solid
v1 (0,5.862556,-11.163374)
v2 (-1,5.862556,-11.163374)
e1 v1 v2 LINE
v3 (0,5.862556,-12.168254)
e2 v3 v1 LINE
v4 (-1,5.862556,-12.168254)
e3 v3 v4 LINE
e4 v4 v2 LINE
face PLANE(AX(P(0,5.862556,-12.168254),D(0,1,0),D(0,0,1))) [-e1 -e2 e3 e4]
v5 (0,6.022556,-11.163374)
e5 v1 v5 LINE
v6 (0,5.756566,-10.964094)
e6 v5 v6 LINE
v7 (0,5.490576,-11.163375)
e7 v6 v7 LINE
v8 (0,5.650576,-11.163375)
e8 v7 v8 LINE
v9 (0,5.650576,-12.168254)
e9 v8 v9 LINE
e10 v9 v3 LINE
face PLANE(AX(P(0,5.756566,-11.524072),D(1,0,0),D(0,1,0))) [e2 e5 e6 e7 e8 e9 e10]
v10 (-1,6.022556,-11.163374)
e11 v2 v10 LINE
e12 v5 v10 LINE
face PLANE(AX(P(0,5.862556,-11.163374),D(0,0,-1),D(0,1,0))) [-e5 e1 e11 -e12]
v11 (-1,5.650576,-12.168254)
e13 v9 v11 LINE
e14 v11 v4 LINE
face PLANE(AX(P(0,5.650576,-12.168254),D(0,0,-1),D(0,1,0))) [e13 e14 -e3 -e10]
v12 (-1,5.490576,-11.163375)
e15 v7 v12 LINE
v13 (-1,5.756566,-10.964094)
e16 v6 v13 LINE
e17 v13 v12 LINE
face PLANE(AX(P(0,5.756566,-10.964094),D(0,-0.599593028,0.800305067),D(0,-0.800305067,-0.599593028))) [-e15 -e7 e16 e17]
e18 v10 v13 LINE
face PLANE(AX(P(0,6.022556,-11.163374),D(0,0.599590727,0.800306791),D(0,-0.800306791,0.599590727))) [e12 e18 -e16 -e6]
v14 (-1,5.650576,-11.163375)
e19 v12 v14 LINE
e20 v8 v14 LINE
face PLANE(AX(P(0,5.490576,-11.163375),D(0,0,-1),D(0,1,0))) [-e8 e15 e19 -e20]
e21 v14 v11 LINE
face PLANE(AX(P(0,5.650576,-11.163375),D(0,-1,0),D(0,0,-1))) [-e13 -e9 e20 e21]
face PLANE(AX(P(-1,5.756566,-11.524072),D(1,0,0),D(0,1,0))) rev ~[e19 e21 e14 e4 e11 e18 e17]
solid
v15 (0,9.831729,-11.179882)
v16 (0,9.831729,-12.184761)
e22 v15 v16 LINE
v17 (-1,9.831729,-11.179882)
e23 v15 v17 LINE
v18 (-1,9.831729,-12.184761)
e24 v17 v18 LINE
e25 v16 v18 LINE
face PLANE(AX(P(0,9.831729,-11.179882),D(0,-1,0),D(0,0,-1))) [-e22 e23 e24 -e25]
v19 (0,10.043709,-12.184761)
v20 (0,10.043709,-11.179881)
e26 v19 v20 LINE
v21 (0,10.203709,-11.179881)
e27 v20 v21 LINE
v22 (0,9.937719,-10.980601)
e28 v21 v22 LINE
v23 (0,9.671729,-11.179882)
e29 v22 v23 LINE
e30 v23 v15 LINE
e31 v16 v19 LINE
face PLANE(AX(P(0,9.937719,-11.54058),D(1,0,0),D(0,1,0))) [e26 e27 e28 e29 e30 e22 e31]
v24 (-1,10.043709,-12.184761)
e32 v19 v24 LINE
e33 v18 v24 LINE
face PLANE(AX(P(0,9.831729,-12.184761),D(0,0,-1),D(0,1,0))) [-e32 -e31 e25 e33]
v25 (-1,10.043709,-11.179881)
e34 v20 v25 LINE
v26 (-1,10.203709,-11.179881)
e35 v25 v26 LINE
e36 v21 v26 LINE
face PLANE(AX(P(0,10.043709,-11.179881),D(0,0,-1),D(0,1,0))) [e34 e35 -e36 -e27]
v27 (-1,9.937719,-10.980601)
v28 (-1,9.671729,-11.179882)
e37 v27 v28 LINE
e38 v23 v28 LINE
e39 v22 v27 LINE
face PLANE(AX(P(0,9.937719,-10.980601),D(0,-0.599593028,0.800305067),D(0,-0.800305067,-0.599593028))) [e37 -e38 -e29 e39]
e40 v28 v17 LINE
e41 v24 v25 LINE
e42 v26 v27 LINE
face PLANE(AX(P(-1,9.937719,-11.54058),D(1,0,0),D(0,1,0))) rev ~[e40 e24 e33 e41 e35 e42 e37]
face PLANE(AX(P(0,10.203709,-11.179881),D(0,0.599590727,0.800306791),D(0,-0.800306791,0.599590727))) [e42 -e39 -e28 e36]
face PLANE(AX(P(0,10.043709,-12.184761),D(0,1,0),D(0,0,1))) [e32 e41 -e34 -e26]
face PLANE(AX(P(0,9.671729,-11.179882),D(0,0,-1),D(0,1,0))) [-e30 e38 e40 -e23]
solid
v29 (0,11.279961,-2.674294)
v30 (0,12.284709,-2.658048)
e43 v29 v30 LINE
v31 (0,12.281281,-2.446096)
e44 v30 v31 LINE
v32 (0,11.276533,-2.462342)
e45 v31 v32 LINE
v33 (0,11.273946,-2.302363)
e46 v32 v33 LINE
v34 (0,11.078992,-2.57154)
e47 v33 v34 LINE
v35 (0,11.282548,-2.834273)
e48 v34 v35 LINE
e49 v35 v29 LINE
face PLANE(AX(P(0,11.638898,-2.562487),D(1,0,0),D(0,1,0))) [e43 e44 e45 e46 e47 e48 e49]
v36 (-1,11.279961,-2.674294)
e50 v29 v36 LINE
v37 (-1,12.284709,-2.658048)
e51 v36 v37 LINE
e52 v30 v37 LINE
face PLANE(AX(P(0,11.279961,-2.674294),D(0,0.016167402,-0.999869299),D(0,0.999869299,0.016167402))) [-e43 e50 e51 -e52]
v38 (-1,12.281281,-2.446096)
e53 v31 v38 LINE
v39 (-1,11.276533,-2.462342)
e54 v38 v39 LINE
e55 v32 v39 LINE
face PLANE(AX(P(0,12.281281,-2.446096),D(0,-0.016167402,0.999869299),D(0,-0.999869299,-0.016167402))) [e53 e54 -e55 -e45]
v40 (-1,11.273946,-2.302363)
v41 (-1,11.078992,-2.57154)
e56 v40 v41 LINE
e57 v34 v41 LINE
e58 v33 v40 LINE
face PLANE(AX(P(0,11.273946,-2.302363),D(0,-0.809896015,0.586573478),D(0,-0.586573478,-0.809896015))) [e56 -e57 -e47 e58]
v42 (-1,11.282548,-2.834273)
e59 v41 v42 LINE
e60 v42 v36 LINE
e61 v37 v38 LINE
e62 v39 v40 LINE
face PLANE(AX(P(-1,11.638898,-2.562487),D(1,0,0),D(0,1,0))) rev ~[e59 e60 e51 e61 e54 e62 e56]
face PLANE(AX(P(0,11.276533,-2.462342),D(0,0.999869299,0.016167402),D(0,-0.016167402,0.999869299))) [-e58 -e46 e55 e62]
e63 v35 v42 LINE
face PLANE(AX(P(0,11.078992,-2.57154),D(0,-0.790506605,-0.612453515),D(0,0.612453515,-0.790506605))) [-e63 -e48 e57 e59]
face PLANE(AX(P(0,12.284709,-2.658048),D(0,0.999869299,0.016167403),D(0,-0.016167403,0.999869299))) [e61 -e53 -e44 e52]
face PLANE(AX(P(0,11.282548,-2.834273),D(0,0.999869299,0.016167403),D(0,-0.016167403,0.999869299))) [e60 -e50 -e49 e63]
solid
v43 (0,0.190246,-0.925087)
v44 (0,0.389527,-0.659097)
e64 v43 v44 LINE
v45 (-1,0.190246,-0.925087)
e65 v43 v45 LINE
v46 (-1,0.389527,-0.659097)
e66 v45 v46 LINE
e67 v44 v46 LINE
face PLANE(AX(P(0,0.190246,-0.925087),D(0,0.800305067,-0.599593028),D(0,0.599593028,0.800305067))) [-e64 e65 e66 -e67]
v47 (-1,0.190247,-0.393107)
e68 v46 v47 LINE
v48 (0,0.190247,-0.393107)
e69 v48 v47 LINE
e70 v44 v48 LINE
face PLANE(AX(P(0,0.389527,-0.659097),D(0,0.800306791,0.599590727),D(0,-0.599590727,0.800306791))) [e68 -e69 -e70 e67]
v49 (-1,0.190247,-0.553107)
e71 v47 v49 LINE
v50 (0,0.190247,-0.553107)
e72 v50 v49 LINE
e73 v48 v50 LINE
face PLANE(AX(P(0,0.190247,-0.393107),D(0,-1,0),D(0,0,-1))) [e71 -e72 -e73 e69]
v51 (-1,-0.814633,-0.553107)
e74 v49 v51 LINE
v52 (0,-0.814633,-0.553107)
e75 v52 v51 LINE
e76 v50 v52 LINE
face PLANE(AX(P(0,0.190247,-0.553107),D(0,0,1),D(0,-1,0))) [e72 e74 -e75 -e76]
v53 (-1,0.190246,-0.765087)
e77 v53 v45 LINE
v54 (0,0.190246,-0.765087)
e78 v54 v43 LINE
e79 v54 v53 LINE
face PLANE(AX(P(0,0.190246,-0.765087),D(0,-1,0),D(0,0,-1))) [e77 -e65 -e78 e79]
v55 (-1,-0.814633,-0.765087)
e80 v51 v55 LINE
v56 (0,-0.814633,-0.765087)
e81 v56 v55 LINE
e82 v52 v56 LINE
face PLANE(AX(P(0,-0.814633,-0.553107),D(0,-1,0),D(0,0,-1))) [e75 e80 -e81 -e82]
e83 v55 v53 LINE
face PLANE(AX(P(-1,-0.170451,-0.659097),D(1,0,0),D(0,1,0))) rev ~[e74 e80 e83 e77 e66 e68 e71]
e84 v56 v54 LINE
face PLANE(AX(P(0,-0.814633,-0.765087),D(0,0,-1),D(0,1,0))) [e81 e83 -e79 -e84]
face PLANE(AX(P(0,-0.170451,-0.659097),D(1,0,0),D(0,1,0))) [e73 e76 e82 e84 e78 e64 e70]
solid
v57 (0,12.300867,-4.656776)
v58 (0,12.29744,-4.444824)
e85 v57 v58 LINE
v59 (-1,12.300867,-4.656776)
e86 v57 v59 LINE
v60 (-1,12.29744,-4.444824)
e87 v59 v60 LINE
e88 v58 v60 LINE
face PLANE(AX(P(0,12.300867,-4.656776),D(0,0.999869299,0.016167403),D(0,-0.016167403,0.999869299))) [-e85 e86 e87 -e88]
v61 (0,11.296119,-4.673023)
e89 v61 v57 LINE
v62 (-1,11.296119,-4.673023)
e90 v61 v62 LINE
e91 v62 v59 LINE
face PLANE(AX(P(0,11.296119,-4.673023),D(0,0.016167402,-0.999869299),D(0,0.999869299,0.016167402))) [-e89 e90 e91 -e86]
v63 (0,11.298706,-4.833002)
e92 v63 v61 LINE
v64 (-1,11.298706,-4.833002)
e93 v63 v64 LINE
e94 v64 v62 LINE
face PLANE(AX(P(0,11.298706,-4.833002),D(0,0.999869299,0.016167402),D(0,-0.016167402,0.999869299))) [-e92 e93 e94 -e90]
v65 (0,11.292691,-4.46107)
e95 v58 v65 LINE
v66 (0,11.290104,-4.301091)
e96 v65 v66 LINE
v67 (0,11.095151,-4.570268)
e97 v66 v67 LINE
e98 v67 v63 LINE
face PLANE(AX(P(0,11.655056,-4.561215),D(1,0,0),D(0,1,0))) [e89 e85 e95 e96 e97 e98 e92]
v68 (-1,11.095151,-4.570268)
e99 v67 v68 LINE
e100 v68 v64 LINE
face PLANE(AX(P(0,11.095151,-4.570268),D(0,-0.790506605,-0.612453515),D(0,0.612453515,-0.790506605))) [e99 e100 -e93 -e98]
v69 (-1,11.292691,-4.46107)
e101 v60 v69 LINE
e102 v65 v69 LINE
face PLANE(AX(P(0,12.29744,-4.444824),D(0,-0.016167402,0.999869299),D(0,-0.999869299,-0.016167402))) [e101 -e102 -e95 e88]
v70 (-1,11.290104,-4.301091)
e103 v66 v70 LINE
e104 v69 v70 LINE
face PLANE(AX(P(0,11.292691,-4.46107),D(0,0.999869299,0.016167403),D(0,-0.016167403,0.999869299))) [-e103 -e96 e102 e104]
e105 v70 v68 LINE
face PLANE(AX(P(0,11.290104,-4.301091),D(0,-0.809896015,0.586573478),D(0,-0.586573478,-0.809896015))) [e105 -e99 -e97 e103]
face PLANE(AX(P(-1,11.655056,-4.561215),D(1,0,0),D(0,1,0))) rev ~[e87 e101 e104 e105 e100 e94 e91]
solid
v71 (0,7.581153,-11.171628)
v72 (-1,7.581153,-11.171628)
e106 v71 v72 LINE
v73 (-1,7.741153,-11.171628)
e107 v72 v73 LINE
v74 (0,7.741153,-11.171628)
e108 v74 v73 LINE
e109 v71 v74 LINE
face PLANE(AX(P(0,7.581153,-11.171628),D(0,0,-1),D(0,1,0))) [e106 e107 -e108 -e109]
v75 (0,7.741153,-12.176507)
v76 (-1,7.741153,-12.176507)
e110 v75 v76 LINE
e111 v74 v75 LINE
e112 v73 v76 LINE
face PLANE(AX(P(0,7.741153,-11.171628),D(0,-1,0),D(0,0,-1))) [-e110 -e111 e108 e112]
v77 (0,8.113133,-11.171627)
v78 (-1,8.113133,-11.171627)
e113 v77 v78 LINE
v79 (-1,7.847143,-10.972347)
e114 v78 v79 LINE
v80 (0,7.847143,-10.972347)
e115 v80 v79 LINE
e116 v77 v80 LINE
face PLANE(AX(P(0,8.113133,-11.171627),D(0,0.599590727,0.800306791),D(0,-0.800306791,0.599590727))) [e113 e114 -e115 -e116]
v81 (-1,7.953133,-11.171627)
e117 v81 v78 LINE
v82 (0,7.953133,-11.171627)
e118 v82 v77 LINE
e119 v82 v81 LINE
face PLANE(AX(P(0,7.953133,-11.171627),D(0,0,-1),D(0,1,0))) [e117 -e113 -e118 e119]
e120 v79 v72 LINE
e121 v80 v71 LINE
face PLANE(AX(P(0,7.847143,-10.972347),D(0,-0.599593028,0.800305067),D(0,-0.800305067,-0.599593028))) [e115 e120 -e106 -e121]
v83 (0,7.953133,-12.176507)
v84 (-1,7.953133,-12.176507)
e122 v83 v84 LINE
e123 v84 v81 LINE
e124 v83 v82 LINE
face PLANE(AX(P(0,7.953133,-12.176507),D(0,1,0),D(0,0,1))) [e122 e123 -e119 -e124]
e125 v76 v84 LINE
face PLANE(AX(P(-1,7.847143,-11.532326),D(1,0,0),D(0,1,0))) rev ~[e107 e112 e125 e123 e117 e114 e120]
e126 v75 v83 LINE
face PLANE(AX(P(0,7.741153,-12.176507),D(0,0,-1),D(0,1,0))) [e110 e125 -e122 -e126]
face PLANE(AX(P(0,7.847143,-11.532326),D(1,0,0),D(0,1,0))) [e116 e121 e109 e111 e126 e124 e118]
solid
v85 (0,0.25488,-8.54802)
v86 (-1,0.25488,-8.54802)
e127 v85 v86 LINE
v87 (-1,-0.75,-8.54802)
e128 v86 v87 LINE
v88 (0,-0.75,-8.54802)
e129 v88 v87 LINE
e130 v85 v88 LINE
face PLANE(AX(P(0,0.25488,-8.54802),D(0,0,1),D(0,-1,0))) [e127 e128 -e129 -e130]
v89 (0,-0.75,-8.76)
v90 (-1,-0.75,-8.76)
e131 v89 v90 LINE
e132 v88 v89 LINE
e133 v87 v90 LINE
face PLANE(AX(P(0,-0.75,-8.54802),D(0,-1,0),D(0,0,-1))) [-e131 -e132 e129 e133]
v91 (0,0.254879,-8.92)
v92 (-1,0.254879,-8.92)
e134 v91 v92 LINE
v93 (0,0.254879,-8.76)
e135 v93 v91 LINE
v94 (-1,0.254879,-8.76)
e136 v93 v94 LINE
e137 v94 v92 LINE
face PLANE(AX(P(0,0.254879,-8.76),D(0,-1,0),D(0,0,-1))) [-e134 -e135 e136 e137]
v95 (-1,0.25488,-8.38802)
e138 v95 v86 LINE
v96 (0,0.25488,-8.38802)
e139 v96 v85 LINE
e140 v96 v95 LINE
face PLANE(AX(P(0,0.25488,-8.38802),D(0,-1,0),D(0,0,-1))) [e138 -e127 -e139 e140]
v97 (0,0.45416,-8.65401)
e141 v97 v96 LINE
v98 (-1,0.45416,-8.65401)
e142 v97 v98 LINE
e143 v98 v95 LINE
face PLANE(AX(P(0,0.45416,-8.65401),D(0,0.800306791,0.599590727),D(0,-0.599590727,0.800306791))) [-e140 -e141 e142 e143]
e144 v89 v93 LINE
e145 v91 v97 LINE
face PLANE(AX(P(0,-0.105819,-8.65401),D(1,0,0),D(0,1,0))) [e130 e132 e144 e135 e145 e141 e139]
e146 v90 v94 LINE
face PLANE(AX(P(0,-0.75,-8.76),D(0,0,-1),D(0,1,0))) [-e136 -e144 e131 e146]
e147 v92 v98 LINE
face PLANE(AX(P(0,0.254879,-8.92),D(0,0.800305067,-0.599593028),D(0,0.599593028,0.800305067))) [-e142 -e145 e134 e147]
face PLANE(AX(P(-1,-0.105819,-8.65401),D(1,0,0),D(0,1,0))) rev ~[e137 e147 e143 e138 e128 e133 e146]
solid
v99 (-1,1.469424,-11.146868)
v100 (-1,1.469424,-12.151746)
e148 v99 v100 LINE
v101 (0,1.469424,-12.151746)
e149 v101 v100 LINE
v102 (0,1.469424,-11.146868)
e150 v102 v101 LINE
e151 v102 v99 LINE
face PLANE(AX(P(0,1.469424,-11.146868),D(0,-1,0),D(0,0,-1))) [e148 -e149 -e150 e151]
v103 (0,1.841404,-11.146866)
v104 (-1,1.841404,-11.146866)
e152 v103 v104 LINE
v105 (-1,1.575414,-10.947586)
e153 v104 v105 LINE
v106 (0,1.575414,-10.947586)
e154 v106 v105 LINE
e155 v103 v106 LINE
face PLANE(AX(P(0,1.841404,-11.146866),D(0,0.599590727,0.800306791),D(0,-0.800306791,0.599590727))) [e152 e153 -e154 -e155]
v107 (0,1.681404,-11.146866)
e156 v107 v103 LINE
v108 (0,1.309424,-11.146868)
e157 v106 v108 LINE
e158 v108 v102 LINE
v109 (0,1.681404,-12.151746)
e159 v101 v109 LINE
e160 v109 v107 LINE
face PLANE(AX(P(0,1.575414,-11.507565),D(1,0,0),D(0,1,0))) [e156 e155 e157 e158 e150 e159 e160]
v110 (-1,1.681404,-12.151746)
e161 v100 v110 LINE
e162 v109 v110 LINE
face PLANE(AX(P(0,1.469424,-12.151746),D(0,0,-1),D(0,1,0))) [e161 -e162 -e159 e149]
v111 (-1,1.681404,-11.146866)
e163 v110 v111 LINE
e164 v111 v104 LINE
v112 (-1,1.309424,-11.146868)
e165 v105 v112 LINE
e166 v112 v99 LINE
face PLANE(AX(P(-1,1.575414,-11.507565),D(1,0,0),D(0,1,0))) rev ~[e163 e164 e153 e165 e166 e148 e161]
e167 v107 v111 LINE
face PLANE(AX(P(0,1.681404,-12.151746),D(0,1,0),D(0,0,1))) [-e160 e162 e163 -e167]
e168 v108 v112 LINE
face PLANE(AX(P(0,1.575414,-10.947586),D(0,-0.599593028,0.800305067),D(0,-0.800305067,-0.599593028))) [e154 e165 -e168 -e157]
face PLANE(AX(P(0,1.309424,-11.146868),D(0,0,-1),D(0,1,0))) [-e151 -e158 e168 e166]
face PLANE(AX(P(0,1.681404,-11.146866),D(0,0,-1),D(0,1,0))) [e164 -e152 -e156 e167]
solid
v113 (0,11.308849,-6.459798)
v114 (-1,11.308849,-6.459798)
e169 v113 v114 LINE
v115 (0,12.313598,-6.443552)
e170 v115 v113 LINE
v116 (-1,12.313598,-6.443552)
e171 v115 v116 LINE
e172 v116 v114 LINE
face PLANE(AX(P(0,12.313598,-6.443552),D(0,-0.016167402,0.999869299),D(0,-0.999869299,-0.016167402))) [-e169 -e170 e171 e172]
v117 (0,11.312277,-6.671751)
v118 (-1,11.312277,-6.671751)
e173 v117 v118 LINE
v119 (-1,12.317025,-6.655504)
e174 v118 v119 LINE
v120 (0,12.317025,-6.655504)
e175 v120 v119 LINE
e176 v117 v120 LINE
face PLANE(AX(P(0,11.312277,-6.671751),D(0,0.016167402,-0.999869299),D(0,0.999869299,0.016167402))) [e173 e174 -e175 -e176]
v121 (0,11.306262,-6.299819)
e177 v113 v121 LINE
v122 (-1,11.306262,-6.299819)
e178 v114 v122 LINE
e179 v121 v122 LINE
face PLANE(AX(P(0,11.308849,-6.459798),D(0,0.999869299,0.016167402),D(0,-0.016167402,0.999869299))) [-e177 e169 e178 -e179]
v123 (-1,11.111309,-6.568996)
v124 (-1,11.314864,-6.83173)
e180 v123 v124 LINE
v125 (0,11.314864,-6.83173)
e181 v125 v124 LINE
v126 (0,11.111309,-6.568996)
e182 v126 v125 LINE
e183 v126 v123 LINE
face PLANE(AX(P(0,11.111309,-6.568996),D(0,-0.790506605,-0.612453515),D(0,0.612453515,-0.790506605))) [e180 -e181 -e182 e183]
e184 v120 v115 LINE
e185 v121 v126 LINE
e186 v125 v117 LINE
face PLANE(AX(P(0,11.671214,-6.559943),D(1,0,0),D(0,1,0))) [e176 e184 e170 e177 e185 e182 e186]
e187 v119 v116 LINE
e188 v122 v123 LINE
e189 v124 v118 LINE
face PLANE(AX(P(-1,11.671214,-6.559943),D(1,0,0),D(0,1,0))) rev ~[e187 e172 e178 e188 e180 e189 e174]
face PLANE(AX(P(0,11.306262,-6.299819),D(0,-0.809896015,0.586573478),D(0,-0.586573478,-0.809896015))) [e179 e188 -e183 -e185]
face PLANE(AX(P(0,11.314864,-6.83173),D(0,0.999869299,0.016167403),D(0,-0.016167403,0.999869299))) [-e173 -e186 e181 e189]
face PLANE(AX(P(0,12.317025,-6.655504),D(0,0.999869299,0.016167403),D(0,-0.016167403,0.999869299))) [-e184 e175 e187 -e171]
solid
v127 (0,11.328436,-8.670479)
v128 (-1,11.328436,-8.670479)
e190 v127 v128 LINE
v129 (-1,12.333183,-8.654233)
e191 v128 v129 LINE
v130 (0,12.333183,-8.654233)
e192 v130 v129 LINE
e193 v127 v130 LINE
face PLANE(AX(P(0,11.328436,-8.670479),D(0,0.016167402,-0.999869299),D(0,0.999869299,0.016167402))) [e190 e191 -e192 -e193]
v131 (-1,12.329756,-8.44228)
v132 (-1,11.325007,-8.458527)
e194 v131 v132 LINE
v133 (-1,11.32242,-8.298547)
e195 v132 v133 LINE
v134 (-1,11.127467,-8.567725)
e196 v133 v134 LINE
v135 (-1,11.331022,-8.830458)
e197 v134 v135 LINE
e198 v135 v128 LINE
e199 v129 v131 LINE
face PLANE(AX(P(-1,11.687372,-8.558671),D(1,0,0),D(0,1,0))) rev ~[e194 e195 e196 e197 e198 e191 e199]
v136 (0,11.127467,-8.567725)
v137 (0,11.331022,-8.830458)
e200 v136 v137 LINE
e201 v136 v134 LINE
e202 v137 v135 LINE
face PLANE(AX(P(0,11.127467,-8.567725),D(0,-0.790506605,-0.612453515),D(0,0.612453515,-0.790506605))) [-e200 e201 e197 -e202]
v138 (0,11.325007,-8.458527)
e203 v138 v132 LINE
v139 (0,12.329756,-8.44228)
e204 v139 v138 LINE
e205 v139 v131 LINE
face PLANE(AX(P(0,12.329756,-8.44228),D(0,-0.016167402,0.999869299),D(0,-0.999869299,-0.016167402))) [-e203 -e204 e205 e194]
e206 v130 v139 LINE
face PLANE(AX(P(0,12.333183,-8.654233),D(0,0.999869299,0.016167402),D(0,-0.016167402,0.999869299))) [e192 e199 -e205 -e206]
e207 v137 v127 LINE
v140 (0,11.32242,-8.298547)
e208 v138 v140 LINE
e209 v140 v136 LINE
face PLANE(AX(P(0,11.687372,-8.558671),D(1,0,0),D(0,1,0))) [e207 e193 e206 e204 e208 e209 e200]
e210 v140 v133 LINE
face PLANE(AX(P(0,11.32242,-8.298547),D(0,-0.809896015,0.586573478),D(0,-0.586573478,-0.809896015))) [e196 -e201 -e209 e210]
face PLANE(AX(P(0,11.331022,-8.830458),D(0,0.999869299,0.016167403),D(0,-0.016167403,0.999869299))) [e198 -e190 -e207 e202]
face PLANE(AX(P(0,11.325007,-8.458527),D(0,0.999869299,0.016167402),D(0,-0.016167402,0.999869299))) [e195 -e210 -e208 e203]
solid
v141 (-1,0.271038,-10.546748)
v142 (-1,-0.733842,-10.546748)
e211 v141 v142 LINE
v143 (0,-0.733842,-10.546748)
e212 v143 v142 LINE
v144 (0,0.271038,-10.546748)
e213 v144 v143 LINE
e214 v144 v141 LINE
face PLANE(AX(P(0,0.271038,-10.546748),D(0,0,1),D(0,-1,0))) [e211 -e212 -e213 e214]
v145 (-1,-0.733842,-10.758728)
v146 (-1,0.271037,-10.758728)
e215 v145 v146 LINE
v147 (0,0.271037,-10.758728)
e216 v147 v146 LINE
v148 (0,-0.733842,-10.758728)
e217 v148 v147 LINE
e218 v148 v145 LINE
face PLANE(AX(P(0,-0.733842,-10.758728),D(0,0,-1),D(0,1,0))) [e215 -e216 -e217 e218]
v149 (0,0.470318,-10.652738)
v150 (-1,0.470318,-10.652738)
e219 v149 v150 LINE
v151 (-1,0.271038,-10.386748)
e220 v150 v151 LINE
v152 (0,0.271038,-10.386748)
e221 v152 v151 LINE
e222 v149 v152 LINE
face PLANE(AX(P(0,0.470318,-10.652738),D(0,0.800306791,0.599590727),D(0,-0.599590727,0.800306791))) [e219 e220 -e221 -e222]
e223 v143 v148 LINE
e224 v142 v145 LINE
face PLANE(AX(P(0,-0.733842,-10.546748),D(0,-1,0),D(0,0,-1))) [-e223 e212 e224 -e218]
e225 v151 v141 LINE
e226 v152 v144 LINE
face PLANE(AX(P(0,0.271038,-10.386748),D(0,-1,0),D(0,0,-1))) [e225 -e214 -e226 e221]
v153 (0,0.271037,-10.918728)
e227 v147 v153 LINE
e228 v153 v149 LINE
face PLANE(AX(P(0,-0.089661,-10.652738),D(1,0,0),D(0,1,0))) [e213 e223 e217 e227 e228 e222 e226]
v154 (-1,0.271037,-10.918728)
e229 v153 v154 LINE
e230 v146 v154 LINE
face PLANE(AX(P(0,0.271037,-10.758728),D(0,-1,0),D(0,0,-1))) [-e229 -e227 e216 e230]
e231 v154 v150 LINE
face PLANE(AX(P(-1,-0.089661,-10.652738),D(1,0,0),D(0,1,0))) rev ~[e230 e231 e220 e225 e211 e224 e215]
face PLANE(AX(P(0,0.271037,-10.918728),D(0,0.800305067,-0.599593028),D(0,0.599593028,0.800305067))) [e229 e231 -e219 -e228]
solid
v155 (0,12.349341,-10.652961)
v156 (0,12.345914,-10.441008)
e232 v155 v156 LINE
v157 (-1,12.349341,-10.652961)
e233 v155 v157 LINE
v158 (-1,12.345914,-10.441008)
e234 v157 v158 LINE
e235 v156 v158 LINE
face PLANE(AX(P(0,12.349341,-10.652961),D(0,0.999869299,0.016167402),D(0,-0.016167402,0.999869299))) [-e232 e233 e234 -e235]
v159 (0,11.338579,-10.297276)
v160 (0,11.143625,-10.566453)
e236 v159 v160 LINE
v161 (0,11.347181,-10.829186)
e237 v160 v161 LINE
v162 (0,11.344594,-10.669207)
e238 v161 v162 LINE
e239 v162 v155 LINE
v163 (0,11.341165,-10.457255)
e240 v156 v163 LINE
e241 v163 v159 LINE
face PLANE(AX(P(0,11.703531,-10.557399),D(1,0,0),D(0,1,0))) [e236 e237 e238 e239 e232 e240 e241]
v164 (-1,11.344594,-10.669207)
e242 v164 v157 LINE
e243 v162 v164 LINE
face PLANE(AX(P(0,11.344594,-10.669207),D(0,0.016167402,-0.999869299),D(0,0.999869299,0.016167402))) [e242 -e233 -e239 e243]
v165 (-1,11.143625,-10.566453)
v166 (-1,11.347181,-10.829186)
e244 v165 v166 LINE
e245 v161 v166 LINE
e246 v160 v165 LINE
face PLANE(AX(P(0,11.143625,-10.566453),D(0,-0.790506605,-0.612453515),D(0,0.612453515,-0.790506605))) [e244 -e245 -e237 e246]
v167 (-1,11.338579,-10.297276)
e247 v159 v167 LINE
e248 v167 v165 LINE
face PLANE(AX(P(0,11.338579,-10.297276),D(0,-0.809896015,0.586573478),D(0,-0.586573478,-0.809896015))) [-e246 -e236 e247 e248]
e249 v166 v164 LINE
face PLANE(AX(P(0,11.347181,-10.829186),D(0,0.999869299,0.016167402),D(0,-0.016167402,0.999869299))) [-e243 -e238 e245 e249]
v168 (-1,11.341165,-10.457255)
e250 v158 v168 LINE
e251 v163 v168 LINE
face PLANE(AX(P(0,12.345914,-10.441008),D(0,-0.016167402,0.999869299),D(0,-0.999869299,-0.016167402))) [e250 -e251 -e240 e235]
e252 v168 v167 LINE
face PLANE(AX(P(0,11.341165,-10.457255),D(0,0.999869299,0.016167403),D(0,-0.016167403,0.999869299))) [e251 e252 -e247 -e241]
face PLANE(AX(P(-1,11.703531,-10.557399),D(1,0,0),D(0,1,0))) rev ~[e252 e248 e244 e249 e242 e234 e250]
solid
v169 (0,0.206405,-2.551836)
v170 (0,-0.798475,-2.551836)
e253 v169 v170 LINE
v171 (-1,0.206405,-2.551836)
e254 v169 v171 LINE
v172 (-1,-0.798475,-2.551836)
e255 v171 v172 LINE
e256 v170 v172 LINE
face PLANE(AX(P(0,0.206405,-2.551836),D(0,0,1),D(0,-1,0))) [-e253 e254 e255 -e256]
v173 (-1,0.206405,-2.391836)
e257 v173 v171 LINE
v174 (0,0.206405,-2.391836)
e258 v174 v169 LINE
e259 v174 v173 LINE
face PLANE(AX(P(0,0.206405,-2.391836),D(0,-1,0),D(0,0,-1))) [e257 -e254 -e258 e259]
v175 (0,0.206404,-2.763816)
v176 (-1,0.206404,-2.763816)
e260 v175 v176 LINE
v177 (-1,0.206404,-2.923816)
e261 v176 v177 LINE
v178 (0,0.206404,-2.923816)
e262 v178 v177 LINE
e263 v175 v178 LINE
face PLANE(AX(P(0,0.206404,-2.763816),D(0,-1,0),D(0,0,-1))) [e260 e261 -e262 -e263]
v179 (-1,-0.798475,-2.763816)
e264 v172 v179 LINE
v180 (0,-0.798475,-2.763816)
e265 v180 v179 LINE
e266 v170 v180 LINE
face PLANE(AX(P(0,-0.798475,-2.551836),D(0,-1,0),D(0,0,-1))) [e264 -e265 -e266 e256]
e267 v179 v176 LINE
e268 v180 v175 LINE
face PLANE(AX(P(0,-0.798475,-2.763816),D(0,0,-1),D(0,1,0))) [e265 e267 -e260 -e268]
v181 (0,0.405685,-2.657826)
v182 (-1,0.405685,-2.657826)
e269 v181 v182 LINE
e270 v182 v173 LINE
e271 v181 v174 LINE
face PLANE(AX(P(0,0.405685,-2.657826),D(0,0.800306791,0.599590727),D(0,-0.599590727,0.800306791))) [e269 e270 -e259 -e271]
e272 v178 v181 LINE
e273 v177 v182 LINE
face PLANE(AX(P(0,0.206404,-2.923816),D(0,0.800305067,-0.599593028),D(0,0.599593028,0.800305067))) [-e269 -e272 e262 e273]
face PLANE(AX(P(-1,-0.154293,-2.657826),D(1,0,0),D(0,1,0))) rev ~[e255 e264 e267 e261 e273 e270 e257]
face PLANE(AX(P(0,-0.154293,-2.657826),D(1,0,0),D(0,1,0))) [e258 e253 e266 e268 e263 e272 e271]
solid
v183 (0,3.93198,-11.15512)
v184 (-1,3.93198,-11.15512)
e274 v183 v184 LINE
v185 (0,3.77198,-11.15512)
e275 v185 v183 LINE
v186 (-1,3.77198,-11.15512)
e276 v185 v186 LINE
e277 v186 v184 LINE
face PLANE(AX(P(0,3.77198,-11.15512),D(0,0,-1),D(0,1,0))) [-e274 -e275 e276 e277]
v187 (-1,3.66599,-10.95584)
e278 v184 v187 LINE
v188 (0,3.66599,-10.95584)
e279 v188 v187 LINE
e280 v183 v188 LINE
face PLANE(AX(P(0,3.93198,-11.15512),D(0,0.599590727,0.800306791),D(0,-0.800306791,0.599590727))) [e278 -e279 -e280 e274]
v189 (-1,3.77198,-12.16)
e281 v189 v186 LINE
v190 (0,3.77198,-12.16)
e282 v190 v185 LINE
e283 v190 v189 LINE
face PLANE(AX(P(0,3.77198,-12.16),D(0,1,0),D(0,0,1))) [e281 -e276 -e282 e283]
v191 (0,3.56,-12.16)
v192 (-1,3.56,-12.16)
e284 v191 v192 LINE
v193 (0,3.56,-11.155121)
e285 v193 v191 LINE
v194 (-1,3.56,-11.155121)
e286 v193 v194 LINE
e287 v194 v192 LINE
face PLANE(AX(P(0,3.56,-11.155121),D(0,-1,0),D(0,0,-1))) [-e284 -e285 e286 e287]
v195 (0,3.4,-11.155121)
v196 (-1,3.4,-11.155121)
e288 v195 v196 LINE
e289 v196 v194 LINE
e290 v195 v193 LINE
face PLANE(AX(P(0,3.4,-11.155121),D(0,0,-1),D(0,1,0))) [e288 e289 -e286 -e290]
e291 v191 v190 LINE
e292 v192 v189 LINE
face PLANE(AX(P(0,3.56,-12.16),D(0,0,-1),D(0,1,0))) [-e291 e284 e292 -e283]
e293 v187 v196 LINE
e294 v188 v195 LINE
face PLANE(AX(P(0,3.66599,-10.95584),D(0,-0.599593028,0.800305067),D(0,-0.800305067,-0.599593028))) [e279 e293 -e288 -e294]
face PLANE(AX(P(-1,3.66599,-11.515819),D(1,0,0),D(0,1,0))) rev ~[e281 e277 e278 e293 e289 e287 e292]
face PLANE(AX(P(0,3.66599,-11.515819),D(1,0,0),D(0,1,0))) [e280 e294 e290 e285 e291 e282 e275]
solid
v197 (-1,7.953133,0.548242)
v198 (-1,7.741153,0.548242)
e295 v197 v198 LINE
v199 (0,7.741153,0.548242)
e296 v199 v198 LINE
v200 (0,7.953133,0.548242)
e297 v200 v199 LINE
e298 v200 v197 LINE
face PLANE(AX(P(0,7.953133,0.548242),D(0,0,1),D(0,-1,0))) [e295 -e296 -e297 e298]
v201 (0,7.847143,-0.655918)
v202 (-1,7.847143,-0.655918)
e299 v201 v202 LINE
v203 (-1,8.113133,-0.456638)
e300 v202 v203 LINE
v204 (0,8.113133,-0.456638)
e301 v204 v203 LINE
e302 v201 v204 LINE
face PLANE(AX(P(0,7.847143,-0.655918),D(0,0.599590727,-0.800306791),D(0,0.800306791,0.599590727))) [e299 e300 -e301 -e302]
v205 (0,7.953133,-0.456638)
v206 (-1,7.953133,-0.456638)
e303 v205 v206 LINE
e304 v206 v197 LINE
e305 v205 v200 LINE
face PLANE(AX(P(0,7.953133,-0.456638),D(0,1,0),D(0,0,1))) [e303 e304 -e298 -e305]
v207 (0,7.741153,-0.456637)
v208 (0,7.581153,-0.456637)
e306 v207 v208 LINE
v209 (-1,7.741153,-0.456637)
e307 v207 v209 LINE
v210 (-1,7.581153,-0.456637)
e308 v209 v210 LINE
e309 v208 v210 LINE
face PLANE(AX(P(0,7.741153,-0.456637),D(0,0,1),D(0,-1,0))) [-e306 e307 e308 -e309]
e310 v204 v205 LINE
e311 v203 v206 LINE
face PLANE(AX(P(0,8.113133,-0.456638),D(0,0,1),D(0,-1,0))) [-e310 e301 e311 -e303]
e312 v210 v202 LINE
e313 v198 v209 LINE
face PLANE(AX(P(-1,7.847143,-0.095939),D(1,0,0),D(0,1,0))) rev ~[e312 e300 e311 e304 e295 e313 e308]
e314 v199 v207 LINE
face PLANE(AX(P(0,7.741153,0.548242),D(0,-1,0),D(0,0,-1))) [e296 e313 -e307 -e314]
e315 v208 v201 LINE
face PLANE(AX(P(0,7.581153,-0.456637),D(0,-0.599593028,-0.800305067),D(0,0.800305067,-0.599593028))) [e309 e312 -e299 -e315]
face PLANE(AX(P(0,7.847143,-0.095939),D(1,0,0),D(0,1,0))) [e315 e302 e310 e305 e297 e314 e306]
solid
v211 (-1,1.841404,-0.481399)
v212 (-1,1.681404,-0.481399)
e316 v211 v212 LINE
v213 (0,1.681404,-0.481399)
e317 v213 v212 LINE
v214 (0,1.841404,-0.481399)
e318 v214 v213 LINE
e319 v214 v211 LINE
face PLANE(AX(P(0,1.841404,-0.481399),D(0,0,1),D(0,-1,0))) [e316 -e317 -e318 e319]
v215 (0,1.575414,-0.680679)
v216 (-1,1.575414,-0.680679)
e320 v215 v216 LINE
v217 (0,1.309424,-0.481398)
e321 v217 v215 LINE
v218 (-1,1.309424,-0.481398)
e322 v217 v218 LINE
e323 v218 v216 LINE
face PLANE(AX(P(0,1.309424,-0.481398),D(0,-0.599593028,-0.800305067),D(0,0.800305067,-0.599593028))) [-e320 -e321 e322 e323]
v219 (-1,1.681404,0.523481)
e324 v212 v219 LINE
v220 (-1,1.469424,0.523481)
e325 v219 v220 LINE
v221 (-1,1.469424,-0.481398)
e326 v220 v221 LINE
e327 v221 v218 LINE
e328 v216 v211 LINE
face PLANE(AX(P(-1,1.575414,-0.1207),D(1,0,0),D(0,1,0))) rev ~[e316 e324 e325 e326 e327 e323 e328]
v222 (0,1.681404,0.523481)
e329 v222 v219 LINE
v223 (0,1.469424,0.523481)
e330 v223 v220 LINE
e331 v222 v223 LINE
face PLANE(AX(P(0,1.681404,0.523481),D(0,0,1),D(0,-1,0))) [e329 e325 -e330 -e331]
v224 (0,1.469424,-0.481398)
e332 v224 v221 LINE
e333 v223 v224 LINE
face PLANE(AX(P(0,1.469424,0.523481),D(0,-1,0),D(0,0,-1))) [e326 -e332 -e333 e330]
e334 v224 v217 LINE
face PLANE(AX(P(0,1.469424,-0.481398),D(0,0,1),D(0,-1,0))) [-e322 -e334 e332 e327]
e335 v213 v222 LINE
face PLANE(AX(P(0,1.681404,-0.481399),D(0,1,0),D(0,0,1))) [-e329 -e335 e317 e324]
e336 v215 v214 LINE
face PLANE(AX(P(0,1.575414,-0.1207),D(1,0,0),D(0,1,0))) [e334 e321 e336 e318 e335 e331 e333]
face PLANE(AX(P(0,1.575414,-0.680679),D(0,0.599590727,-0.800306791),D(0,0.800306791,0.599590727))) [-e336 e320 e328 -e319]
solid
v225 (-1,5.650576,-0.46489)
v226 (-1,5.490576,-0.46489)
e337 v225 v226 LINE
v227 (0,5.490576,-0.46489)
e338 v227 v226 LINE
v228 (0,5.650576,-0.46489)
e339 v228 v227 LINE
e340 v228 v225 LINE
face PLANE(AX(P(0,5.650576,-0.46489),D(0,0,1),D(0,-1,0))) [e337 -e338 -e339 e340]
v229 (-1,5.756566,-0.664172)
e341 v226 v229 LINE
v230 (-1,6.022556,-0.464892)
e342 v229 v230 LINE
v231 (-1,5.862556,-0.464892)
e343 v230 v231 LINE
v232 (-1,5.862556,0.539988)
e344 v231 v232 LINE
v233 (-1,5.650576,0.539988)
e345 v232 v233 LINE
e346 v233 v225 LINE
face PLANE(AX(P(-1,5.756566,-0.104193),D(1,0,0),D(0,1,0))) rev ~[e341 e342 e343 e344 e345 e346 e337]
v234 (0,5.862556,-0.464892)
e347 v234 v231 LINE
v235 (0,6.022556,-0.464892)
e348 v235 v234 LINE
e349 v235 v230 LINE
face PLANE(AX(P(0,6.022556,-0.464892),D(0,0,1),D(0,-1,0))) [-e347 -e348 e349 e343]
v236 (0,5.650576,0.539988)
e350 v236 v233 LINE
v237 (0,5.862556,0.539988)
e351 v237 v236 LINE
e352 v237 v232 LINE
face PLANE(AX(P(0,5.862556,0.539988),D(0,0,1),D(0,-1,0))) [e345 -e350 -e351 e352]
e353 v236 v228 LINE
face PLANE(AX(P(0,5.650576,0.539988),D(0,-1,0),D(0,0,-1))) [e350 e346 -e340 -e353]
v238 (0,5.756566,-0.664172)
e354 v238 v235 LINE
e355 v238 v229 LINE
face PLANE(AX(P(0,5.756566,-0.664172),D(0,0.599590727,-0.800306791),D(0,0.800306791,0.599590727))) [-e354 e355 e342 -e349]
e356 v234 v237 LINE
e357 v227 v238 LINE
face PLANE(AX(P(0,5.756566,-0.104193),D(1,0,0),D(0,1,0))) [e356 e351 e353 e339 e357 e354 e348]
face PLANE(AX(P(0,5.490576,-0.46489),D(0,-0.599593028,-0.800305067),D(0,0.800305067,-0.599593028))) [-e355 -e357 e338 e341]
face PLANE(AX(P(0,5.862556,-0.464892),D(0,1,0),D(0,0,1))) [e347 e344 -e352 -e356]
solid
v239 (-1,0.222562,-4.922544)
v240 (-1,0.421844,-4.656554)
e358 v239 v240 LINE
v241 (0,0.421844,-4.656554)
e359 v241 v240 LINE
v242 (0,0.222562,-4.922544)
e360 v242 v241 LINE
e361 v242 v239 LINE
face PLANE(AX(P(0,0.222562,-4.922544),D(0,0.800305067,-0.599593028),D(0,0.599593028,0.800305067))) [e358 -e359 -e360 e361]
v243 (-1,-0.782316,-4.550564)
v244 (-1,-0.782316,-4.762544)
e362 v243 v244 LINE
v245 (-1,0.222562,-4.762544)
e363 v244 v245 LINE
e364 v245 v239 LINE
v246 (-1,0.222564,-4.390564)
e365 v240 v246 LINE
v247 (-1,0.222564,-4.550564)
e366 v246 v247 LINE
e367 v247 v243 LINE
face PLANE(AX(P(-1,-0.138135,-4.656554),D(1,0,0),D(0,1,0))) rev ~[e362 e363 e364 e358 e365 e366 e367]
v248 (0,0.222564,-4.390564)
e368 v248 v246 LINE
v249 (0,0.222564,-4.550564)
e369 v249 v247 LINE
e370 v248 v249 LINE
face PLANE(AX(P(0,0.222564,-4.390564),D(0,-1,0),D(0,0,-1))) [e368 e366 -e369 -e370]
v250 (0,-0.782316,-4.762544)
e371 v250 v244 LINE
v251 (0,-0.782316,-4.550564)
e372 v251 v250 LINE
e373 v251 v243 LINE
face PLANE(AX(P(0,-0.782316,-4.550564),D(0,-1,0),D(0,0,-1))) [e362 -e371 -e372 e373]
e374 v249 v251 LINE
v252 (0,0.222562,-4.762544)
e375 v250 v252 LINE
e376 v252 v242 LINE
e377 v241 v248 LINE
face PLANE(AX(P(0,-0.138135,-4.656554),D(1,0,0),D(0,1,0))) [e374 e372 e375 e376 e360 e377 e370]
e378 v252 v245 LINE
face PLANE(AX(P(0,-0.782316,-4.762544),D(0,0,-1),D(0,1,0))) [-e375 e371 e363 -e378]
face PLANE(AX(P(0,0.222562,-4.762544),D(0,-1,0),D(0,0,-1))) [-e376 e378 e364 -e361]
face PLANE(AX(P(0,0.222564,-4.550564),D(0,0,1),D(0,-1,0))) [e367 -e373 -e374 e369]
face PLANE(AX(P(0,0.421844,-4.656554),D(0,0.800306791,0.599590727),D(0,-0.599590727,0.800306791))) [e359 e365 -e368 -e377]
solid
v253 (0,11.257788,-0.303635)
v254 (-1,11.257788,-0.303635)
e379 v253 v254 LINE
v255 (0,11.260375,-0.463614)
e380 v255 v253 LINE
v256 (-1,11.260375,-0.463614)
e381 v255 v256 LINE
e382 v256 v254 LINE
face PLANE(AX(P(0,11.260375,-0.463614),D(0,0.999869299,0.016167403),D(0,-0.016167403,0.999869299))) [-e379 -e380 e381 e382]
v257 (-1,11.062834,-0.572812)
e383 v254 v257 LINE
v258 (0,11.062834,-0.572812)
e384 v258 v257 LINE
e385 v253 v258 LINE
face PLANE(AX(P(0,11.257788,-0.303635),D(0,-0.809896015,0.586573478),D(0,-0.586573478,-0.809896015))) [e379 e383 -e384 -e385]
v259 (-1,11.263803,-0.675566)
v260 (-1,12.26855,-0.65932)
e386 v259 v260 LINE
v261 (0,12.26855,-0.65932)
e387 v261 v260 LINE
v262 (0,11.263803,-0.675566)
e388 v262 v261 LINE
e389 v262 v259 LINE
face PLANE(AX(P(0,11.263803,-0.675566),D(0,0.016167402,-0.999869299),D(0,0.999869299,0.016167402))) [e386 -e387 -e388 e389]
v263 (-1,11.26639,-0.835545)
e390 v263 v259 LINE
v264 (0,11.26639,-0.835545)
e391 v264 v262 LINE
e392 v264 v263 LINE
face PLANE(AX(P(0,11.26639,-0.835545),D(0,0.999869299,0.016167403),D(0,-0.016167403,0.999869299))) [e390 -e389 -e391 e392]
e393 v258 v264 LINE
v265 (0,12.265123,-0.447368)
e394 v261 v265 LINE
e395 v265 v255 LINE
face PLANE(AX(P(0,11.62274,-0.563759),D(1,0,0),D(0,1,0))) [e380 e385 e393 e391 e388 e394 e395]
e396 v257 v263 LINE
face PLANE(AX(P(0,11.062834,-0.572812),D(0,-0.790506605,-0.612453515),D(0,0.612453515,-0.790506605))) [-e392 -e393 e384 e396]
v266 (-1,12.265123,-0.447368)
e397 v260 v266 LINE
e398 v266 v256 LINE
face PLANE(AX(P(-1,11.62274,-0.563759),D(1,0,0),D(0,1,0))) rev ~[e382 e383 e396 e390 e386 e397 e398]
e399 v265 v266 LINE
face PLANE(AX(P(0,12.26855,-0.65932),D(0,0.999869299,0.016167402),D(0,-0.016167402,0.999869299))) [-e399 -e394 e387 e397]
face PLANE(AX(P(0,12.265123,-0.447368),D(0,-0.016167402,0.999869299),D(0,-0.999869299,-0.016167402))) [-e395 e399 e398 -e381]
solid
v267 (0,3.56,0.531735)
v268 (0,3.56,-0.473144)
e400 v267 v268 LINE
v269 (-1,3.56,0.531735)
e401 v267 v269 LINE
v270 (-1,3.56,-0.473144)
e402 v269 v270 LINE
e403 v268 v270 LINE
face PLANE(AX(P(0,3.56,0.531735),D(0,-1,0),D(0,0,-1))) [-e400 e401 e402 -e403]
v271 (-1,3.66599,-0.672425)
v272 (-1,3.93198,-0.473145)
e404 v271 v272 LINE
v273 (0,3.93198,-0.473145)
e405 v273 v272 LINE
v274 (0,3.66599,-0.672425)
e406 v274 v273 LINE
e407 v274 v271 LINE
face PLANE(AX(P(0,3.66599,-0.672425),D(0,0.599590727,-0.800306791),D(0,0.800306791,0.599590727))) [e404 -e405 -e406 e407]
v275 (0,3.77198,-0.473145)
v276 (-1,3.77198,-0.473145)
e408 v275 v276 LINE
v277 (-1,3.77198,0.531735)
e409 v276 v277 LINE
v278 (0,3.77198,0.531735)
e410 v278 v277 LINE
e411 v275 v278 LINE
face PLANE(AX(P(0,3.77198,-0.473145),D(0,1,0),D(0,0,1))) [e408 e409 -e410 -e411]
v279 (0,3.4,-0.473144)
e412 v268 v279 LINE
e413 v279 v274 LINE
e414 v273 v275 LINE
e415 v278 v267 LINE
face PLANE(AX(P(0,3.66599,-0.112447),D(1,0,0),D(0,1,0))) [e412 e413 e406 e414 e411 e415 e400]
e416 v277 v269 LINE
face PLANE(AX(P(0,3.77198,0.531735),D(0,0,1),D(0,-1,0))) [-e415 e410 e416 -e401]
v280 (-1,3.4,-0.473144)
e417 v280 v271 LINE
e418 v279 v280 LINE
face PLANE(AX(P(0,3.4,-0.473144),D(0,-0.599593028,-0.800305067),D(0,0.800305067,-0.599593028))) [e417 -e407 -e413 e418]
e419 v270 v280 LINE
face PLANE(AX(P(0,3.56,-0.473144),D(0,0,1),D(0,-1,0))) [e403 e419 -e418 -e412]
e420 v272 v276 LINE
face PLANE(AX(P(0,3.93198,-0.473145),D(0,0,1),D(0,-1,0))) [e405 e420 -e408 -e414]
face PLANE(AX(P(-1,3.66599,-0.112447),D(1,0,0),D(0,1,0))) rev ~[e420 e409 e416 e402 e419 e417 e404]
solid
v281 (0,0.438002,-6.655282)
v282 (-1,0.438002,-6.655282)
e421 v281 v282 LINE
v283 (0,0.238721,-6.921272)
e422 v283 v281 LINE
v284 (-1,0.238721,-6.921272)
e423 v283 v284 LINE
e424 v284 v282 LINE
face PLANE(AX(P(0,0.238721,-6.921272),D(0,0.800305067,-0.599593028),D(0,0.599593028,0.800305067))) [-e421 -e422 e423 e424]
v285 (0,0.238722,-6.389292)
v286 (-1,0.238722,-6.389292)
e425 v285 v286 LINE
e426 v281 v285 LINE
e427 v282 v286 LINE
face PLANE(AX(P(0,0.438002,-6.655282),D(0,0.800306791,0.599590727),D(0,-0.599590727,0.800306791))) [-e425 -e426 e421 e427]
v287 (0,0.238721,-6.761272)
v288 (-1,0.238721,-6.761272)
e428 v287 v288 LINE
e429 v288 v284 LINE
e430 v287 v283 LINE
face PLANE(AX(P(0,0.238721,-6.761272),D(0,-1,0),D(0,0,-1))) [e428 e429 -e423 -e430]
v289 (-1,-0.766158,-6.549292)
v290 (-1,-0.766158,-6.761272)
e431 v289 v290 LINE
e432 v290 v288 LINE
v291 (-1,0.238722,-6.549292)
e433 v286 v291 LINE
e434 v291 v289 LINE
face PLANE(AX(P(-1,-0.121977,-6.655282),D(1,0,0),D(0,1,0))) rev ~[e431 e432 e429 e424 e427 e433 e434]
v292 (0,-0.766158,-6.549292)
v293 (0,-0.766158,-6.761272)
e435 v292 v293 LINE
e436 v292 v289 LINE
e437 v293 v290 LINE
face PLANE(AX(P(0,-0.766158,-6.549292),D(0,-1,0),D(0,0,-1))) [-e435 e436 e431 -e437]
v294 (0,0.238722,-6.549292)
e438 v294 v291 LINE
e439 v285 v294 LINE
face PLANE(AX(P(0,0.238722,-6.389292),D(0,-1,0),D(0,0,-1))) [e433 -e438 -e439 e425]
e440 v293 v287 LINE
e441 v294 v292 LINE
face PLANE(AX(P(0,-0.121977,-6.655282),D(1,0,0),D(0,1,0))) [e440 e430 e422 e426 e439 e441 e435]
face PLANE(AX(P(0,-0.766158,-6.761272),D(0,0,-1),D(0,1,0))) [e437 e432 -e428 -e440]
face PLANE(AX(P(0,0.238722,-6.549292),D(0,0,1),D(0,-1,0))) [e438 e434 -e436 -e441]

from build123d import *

# Parameters (mm, degrees)
F1_DEPTH = 1


# Not quite as in the source:
# - a feature names something its author has since deleted; it is built from what else it names


with BuildPart() as f1:
    # F0 (on Right) → F1 (new body)
    with BuildSketch(Plane.YZ):
        Polygon((-0.733841823, -10.7587281415), (0.2710369828, -10.7587281415), (0.2710369828, -10.9187281415), (0.470318177, -10.6527381415), (0.271038177, -10.3867481415), (0.271038177, -10.5467481415), (-0.733841823, -10.5467481415), align=None)
    extrude(amount=-F1_DEPTH)


with BuildPart() as f1b:
    # F0 (on Right) → F1, piece 2 (new body)
    with BuildSketch(Plane.YZ):
        Polygon((1.3094237074, -11.1468675475), (1.4694237074, -11.1468675475), (1.4694237074, -12.1517463532), (1.6814037074, -12.1517463532), (1.6814037074, -11.1468663532), (1.8414037074, -11.1468663532), (1.5754137074, -10.9475863532), align=None)
    extrude(amount=-F1_DEPTH)


with BuildPart() as f1c:
    # F0 (on Right) → F1, piece 3 (new body)
    with BuildSketch(Plane.YZ):
        Polygon((3.56, -11.1551211942), (3.56, -12.16), (3.77198, -12.16), (3.77198, -11.15512), (3.93198, -11.15512), (3.66599, -10.95584), (3.4, -11.1551211942), align=None)
    extrude(amount=-F1_DEPTH)


with BuildPart() as f1d:
    # F0 (on Right) → F1, piece 4 (new body)
    with BuildSketch(Plane.YZ):
        Polygon((5.6505762926, -11.163374841), (5.6505762926, -12.1682536468), (5.8625562926, -12.1682536468), (5.8625562926, -11.1633736468), (6.0225562926, -11.1633736468), (5.7565662926, -10.9640936468), (5.4905762926, -11.163374841), align=None)
    extrude(amount=-F1_DEPTH)


with BuildPart() as f1e:
    # F0 (on Right) → F1, piece 5 (new body)
    with BuildSketch(Plane.YZ):
        Polygon((7.7411525851, -11.1716284878), (7.7411525851, -12.1765072935), (7.9531325851, -12.1765072935), (7.9531325851, -11.1716272935), (8.1131325851, -11.1716272935), (7.8471425851, -10.9723472935), (7.5811525851, -11.1716284878), align=None)
    extrude(amount=-F1_DEPTH)


with BuildPart() as f1f:
    # F0 (on Right) → F1, piece 6 (new body)
    with BuildSketch(Plane.YZ):
        Polygon((9.8317288777, -11.1798821345), (9.8317288777, -12.1847609403), (10.0437088777, -12.1847609403), (10.0437088777, -11.1798809403), (10.2037088777, -11.1798809403), (9.9377188777, -10.9806009403), (9.6717288777, -11.1798821345), align=None)
    extrude(amount=-F1_DEPTH)


with BuildPart() as f1g:
    # F0 (on Right) → F1, piece 7 (new body)
    with BuildSketch(Plane.YZ):
        Polygon((11.3385786263, -10.2972756044), (11.1436250398, -10.5664526792), (11.3471805551, -10.8291860548), (11.3445937707, -10.6692069669), (12.3493412378, -10.6529606869), (12.3459140719, -10.4410083929), (11.3411654107, -10.4572546922), align=None)
    extrude(amount=-F1_DEPTH)


with BuildPart() as f1h:
    # F0 (on Right) → F1, piece 8 (new body)
    with BuildSketch(Plane.YZ):
        Polygon((11.3310223781, -8.8304579133), (11.3284355937, -8.6704788255), (12.3331830608, -8.6542325454), (12.3297558949, -8.4422802514), (11.3250072337, -8.4585265508), (11.3224204493, -8.2985474629), (11.1274668627, -8.5677245377), align=None)
    extrude(amount=-F1_DEPTH)


with BuildPart() as f1i:
    # F0 (on Right) → F1, piece 9 (new body)
    with BuildSketch(Plane.YZ):
        Polygon((11.3062622723, -6.2998193215), (11.1113086857, -6.5689963962), (11.3148642011, -6.8317297718), (11.3122774167, -6.671750684), (12.3170248838, -6.655504404), (12.3135977178, -6.44355211), (11.3088490566, -6.4597984093), align=None)
    extrude(amount=-F1_DEPTH)


with BuildPart() as f1j:
    # F0 (on Right) → F1, piece 10 (new body)
    with BuildSketch(Plane.YZ):
        Polygon((12.2974395408, -4.4448239685), (11.2926908796, -4.4610702678), (11.2901040952, -4.30109118), (11.0951505087, -4.5702682548), (11.298706024, -4.8330016304), (11.2961192397, -4.6730225425), (12.3008667068, -4.6567762625), align=None)
    extrude(amount=-F1_DEPTH)


with BuildPart() as f1k:
    # F0 (on Right) → F1, piece 11 (new body)
    with BuildSketch(Plane.YZ):
        Polygon((11.2739459182, -2.3023630385), (11.0789923317, -2.5715401133), (11.282547847, -2.8342734889), (11.2799610626, -2.6742944011), (12.2847085298, -2.658048121), (12.2812813638, -2.446095827), (11.2765327026, -2.4623421264), align=None)
    extrude(amount=-F1_DEPTH)


with BuildPart() as f1l:
    # F0 (on Right) → F1, piece 12 (new body)
    with BuildSketch(Plane.YZ):
        Polygon((11.2577877412, -0.3036348971), (11.0628341547, -0.5728119719), (11.26638967, -0.8355453474), (11.2638028856, -0.6755662596), (12.2685503527, -0.6593199796), (12.2651231868, -0.4473676856), (11.2603745256, -0.4636139849), align=None)
    extrude(amount=-F1_DEPTH)


with BuildPart() as f1m:
    # F0 (on Right) → F1, piece 13 (new body)
    with BuildSketch(Plane.YZ):
        Polygon((7.5811525851, -0.4566367399), (7.8471425851, -0.6559179341), (8.1131325851, -0.4566379341), (7.9531325851, -0.4566379341), (7.9531325851, 0.5482420659), (7.7411525851, 0.5482420659), (7.7411525851, -0.4566367399), align=None)
    extrude(amount=-F1_DEPTH)


with BuildPart() as f1n:
    # F0 (on Right) → F1, piece 14 (new body)
    with BuildSketch(Plane.YZ):
        Polygon((5.4905762926, -0.4648903866), (5.7565662926, -0.6641715809), (6.0225562926, -0.4648915809), (5.8625562926, -0.4648915809), (5.8625562926, 0.5399884191), (5.6505762926, 0.5399884191), (5.6505762926, -0.4648903866), align=None)
    extrude(amount=-F1_DEPTH)


with BuildPart() as f1o:
    # F0 (on Right) → F1, piece 15 (new body)
    with BuildSketch(Plane.YZ):
        Polygon((3.77198, 0.5317347724), (3.56, 0.5317347724), (3.56, -0.4731440334), (3.4, -0.4731440334), (3.66599, -0.6724252276), (3.93198, -0.4731452276), (3.77198, -0.4731452276), align=None)
    extrude(amount=-F1_DEPTH)


with BuildPart() as f1p:
    # F0 (on Right) → F1, piece 16 (new body)
    with BuildSketch(Plane.YZ):
        Polygon((1.4694237074, 0.5234811256), (1.4694237074, -0.4813976802), (1.3094237074, -0.4813976802), (1.5754137074, -0.6806788744), (1.8414037074, -0.4813988744), (1.6814037074, -0.4813988744), (1.6814037074, 0.5234811256), align=None)
    extrude(amount=-F1_DEPTH)


with BuildPart() as f1q:
    # F0 (on Right) → F1, piece 17 (new body)
    with BuildSketch(Plane.YZ):
        Polygon((0.1902472919, -0.5531074341), (-0.8146327081, -0.5531074341), (-0.8146327081, -0.7650874341), (0.1902460977, -0.7650874341), (0.1902460977, -0.9250874341), (0.3895272919, -0.6590974341), (0.1902472919, -0.3931074341), align=None)
    extrude(amount=-F1_DEPTH)


with BuildPart() as f1r:
    # F0 (on Right) → F1, piece 18 (new body)
    with BuildSketch(Plane.YZ):
        Polygon((0.2064054689, -2.5518355756), (-0.7984745311, -2.5518355756), (-0.7984745311, -2.7638155756), (0.2064042747, -2.7638155756), (0.2064042747, -2.9238155756), (0.4056854689, -2.6578255756), (0.2064054689, -2.3918355756), align=None)
    extrude(amount=-F1_DEPTH)


with BuildPart() as f1s:
    # F0 (on Right) → F1, piece 19 (new body)
    with BuildSketch(Plane.YZ):
        Polygon((0.222563646, -4.5505637171), (-0.782316354, -4.5505637171), (-0.782316354, -4.7625437171), (0.2225624517, -4.7625437171), (0.2225624517, -4.9225437171), (0.421843646, -4.6565537171), (0.222563646, -4.3905637171), align=None)
    extrude(amount=-F1_DEPTH)


with BuildPart() as f1t:
    # F0 (on Right) → F1, piece 20 (new body)
    with BuildSketch(Plane.YZ):
        Polygon((0.238721823, -6.5492918585), (-0.766158177, -6.5492918585), (-0.766158177, -6.7612718585), (0.2387206288, -6.7612718585), (0.2387206288, -6.9212718585), (0.438001823, -6.6552818585), (0.238721823, -6.3892918585), align=None)
    extrude(amount=-F1_DEPTH)


with BuildPart() as f1u:
    # F0 (on Right) → F1, piece 21 (new body)
    with BuildSketch(Plane.YZ):
        Polygon((0.25488, -8.54802), (-0.75, -8.54802), (-0.75, -8.76), (0.2548788058, -8.76), (0.2548788058, -8.92), (0.45416, -8.65401), (0.25488, -8.38802), align=None)
    extrude(amount=-F1_DEPTH)


solid = Compound([f1.part, f1b.part, f1c.part, f1d.part, f1e.part, f1f.part, f1g.part, f1h.part, f1i.part, f1j.part, f1k.part, f1l.part, f1m.part, f1n.part, f1o.part, f1p.part, f1q.part, f1r.part, f1s.part, f1t.part, f1u.part])
